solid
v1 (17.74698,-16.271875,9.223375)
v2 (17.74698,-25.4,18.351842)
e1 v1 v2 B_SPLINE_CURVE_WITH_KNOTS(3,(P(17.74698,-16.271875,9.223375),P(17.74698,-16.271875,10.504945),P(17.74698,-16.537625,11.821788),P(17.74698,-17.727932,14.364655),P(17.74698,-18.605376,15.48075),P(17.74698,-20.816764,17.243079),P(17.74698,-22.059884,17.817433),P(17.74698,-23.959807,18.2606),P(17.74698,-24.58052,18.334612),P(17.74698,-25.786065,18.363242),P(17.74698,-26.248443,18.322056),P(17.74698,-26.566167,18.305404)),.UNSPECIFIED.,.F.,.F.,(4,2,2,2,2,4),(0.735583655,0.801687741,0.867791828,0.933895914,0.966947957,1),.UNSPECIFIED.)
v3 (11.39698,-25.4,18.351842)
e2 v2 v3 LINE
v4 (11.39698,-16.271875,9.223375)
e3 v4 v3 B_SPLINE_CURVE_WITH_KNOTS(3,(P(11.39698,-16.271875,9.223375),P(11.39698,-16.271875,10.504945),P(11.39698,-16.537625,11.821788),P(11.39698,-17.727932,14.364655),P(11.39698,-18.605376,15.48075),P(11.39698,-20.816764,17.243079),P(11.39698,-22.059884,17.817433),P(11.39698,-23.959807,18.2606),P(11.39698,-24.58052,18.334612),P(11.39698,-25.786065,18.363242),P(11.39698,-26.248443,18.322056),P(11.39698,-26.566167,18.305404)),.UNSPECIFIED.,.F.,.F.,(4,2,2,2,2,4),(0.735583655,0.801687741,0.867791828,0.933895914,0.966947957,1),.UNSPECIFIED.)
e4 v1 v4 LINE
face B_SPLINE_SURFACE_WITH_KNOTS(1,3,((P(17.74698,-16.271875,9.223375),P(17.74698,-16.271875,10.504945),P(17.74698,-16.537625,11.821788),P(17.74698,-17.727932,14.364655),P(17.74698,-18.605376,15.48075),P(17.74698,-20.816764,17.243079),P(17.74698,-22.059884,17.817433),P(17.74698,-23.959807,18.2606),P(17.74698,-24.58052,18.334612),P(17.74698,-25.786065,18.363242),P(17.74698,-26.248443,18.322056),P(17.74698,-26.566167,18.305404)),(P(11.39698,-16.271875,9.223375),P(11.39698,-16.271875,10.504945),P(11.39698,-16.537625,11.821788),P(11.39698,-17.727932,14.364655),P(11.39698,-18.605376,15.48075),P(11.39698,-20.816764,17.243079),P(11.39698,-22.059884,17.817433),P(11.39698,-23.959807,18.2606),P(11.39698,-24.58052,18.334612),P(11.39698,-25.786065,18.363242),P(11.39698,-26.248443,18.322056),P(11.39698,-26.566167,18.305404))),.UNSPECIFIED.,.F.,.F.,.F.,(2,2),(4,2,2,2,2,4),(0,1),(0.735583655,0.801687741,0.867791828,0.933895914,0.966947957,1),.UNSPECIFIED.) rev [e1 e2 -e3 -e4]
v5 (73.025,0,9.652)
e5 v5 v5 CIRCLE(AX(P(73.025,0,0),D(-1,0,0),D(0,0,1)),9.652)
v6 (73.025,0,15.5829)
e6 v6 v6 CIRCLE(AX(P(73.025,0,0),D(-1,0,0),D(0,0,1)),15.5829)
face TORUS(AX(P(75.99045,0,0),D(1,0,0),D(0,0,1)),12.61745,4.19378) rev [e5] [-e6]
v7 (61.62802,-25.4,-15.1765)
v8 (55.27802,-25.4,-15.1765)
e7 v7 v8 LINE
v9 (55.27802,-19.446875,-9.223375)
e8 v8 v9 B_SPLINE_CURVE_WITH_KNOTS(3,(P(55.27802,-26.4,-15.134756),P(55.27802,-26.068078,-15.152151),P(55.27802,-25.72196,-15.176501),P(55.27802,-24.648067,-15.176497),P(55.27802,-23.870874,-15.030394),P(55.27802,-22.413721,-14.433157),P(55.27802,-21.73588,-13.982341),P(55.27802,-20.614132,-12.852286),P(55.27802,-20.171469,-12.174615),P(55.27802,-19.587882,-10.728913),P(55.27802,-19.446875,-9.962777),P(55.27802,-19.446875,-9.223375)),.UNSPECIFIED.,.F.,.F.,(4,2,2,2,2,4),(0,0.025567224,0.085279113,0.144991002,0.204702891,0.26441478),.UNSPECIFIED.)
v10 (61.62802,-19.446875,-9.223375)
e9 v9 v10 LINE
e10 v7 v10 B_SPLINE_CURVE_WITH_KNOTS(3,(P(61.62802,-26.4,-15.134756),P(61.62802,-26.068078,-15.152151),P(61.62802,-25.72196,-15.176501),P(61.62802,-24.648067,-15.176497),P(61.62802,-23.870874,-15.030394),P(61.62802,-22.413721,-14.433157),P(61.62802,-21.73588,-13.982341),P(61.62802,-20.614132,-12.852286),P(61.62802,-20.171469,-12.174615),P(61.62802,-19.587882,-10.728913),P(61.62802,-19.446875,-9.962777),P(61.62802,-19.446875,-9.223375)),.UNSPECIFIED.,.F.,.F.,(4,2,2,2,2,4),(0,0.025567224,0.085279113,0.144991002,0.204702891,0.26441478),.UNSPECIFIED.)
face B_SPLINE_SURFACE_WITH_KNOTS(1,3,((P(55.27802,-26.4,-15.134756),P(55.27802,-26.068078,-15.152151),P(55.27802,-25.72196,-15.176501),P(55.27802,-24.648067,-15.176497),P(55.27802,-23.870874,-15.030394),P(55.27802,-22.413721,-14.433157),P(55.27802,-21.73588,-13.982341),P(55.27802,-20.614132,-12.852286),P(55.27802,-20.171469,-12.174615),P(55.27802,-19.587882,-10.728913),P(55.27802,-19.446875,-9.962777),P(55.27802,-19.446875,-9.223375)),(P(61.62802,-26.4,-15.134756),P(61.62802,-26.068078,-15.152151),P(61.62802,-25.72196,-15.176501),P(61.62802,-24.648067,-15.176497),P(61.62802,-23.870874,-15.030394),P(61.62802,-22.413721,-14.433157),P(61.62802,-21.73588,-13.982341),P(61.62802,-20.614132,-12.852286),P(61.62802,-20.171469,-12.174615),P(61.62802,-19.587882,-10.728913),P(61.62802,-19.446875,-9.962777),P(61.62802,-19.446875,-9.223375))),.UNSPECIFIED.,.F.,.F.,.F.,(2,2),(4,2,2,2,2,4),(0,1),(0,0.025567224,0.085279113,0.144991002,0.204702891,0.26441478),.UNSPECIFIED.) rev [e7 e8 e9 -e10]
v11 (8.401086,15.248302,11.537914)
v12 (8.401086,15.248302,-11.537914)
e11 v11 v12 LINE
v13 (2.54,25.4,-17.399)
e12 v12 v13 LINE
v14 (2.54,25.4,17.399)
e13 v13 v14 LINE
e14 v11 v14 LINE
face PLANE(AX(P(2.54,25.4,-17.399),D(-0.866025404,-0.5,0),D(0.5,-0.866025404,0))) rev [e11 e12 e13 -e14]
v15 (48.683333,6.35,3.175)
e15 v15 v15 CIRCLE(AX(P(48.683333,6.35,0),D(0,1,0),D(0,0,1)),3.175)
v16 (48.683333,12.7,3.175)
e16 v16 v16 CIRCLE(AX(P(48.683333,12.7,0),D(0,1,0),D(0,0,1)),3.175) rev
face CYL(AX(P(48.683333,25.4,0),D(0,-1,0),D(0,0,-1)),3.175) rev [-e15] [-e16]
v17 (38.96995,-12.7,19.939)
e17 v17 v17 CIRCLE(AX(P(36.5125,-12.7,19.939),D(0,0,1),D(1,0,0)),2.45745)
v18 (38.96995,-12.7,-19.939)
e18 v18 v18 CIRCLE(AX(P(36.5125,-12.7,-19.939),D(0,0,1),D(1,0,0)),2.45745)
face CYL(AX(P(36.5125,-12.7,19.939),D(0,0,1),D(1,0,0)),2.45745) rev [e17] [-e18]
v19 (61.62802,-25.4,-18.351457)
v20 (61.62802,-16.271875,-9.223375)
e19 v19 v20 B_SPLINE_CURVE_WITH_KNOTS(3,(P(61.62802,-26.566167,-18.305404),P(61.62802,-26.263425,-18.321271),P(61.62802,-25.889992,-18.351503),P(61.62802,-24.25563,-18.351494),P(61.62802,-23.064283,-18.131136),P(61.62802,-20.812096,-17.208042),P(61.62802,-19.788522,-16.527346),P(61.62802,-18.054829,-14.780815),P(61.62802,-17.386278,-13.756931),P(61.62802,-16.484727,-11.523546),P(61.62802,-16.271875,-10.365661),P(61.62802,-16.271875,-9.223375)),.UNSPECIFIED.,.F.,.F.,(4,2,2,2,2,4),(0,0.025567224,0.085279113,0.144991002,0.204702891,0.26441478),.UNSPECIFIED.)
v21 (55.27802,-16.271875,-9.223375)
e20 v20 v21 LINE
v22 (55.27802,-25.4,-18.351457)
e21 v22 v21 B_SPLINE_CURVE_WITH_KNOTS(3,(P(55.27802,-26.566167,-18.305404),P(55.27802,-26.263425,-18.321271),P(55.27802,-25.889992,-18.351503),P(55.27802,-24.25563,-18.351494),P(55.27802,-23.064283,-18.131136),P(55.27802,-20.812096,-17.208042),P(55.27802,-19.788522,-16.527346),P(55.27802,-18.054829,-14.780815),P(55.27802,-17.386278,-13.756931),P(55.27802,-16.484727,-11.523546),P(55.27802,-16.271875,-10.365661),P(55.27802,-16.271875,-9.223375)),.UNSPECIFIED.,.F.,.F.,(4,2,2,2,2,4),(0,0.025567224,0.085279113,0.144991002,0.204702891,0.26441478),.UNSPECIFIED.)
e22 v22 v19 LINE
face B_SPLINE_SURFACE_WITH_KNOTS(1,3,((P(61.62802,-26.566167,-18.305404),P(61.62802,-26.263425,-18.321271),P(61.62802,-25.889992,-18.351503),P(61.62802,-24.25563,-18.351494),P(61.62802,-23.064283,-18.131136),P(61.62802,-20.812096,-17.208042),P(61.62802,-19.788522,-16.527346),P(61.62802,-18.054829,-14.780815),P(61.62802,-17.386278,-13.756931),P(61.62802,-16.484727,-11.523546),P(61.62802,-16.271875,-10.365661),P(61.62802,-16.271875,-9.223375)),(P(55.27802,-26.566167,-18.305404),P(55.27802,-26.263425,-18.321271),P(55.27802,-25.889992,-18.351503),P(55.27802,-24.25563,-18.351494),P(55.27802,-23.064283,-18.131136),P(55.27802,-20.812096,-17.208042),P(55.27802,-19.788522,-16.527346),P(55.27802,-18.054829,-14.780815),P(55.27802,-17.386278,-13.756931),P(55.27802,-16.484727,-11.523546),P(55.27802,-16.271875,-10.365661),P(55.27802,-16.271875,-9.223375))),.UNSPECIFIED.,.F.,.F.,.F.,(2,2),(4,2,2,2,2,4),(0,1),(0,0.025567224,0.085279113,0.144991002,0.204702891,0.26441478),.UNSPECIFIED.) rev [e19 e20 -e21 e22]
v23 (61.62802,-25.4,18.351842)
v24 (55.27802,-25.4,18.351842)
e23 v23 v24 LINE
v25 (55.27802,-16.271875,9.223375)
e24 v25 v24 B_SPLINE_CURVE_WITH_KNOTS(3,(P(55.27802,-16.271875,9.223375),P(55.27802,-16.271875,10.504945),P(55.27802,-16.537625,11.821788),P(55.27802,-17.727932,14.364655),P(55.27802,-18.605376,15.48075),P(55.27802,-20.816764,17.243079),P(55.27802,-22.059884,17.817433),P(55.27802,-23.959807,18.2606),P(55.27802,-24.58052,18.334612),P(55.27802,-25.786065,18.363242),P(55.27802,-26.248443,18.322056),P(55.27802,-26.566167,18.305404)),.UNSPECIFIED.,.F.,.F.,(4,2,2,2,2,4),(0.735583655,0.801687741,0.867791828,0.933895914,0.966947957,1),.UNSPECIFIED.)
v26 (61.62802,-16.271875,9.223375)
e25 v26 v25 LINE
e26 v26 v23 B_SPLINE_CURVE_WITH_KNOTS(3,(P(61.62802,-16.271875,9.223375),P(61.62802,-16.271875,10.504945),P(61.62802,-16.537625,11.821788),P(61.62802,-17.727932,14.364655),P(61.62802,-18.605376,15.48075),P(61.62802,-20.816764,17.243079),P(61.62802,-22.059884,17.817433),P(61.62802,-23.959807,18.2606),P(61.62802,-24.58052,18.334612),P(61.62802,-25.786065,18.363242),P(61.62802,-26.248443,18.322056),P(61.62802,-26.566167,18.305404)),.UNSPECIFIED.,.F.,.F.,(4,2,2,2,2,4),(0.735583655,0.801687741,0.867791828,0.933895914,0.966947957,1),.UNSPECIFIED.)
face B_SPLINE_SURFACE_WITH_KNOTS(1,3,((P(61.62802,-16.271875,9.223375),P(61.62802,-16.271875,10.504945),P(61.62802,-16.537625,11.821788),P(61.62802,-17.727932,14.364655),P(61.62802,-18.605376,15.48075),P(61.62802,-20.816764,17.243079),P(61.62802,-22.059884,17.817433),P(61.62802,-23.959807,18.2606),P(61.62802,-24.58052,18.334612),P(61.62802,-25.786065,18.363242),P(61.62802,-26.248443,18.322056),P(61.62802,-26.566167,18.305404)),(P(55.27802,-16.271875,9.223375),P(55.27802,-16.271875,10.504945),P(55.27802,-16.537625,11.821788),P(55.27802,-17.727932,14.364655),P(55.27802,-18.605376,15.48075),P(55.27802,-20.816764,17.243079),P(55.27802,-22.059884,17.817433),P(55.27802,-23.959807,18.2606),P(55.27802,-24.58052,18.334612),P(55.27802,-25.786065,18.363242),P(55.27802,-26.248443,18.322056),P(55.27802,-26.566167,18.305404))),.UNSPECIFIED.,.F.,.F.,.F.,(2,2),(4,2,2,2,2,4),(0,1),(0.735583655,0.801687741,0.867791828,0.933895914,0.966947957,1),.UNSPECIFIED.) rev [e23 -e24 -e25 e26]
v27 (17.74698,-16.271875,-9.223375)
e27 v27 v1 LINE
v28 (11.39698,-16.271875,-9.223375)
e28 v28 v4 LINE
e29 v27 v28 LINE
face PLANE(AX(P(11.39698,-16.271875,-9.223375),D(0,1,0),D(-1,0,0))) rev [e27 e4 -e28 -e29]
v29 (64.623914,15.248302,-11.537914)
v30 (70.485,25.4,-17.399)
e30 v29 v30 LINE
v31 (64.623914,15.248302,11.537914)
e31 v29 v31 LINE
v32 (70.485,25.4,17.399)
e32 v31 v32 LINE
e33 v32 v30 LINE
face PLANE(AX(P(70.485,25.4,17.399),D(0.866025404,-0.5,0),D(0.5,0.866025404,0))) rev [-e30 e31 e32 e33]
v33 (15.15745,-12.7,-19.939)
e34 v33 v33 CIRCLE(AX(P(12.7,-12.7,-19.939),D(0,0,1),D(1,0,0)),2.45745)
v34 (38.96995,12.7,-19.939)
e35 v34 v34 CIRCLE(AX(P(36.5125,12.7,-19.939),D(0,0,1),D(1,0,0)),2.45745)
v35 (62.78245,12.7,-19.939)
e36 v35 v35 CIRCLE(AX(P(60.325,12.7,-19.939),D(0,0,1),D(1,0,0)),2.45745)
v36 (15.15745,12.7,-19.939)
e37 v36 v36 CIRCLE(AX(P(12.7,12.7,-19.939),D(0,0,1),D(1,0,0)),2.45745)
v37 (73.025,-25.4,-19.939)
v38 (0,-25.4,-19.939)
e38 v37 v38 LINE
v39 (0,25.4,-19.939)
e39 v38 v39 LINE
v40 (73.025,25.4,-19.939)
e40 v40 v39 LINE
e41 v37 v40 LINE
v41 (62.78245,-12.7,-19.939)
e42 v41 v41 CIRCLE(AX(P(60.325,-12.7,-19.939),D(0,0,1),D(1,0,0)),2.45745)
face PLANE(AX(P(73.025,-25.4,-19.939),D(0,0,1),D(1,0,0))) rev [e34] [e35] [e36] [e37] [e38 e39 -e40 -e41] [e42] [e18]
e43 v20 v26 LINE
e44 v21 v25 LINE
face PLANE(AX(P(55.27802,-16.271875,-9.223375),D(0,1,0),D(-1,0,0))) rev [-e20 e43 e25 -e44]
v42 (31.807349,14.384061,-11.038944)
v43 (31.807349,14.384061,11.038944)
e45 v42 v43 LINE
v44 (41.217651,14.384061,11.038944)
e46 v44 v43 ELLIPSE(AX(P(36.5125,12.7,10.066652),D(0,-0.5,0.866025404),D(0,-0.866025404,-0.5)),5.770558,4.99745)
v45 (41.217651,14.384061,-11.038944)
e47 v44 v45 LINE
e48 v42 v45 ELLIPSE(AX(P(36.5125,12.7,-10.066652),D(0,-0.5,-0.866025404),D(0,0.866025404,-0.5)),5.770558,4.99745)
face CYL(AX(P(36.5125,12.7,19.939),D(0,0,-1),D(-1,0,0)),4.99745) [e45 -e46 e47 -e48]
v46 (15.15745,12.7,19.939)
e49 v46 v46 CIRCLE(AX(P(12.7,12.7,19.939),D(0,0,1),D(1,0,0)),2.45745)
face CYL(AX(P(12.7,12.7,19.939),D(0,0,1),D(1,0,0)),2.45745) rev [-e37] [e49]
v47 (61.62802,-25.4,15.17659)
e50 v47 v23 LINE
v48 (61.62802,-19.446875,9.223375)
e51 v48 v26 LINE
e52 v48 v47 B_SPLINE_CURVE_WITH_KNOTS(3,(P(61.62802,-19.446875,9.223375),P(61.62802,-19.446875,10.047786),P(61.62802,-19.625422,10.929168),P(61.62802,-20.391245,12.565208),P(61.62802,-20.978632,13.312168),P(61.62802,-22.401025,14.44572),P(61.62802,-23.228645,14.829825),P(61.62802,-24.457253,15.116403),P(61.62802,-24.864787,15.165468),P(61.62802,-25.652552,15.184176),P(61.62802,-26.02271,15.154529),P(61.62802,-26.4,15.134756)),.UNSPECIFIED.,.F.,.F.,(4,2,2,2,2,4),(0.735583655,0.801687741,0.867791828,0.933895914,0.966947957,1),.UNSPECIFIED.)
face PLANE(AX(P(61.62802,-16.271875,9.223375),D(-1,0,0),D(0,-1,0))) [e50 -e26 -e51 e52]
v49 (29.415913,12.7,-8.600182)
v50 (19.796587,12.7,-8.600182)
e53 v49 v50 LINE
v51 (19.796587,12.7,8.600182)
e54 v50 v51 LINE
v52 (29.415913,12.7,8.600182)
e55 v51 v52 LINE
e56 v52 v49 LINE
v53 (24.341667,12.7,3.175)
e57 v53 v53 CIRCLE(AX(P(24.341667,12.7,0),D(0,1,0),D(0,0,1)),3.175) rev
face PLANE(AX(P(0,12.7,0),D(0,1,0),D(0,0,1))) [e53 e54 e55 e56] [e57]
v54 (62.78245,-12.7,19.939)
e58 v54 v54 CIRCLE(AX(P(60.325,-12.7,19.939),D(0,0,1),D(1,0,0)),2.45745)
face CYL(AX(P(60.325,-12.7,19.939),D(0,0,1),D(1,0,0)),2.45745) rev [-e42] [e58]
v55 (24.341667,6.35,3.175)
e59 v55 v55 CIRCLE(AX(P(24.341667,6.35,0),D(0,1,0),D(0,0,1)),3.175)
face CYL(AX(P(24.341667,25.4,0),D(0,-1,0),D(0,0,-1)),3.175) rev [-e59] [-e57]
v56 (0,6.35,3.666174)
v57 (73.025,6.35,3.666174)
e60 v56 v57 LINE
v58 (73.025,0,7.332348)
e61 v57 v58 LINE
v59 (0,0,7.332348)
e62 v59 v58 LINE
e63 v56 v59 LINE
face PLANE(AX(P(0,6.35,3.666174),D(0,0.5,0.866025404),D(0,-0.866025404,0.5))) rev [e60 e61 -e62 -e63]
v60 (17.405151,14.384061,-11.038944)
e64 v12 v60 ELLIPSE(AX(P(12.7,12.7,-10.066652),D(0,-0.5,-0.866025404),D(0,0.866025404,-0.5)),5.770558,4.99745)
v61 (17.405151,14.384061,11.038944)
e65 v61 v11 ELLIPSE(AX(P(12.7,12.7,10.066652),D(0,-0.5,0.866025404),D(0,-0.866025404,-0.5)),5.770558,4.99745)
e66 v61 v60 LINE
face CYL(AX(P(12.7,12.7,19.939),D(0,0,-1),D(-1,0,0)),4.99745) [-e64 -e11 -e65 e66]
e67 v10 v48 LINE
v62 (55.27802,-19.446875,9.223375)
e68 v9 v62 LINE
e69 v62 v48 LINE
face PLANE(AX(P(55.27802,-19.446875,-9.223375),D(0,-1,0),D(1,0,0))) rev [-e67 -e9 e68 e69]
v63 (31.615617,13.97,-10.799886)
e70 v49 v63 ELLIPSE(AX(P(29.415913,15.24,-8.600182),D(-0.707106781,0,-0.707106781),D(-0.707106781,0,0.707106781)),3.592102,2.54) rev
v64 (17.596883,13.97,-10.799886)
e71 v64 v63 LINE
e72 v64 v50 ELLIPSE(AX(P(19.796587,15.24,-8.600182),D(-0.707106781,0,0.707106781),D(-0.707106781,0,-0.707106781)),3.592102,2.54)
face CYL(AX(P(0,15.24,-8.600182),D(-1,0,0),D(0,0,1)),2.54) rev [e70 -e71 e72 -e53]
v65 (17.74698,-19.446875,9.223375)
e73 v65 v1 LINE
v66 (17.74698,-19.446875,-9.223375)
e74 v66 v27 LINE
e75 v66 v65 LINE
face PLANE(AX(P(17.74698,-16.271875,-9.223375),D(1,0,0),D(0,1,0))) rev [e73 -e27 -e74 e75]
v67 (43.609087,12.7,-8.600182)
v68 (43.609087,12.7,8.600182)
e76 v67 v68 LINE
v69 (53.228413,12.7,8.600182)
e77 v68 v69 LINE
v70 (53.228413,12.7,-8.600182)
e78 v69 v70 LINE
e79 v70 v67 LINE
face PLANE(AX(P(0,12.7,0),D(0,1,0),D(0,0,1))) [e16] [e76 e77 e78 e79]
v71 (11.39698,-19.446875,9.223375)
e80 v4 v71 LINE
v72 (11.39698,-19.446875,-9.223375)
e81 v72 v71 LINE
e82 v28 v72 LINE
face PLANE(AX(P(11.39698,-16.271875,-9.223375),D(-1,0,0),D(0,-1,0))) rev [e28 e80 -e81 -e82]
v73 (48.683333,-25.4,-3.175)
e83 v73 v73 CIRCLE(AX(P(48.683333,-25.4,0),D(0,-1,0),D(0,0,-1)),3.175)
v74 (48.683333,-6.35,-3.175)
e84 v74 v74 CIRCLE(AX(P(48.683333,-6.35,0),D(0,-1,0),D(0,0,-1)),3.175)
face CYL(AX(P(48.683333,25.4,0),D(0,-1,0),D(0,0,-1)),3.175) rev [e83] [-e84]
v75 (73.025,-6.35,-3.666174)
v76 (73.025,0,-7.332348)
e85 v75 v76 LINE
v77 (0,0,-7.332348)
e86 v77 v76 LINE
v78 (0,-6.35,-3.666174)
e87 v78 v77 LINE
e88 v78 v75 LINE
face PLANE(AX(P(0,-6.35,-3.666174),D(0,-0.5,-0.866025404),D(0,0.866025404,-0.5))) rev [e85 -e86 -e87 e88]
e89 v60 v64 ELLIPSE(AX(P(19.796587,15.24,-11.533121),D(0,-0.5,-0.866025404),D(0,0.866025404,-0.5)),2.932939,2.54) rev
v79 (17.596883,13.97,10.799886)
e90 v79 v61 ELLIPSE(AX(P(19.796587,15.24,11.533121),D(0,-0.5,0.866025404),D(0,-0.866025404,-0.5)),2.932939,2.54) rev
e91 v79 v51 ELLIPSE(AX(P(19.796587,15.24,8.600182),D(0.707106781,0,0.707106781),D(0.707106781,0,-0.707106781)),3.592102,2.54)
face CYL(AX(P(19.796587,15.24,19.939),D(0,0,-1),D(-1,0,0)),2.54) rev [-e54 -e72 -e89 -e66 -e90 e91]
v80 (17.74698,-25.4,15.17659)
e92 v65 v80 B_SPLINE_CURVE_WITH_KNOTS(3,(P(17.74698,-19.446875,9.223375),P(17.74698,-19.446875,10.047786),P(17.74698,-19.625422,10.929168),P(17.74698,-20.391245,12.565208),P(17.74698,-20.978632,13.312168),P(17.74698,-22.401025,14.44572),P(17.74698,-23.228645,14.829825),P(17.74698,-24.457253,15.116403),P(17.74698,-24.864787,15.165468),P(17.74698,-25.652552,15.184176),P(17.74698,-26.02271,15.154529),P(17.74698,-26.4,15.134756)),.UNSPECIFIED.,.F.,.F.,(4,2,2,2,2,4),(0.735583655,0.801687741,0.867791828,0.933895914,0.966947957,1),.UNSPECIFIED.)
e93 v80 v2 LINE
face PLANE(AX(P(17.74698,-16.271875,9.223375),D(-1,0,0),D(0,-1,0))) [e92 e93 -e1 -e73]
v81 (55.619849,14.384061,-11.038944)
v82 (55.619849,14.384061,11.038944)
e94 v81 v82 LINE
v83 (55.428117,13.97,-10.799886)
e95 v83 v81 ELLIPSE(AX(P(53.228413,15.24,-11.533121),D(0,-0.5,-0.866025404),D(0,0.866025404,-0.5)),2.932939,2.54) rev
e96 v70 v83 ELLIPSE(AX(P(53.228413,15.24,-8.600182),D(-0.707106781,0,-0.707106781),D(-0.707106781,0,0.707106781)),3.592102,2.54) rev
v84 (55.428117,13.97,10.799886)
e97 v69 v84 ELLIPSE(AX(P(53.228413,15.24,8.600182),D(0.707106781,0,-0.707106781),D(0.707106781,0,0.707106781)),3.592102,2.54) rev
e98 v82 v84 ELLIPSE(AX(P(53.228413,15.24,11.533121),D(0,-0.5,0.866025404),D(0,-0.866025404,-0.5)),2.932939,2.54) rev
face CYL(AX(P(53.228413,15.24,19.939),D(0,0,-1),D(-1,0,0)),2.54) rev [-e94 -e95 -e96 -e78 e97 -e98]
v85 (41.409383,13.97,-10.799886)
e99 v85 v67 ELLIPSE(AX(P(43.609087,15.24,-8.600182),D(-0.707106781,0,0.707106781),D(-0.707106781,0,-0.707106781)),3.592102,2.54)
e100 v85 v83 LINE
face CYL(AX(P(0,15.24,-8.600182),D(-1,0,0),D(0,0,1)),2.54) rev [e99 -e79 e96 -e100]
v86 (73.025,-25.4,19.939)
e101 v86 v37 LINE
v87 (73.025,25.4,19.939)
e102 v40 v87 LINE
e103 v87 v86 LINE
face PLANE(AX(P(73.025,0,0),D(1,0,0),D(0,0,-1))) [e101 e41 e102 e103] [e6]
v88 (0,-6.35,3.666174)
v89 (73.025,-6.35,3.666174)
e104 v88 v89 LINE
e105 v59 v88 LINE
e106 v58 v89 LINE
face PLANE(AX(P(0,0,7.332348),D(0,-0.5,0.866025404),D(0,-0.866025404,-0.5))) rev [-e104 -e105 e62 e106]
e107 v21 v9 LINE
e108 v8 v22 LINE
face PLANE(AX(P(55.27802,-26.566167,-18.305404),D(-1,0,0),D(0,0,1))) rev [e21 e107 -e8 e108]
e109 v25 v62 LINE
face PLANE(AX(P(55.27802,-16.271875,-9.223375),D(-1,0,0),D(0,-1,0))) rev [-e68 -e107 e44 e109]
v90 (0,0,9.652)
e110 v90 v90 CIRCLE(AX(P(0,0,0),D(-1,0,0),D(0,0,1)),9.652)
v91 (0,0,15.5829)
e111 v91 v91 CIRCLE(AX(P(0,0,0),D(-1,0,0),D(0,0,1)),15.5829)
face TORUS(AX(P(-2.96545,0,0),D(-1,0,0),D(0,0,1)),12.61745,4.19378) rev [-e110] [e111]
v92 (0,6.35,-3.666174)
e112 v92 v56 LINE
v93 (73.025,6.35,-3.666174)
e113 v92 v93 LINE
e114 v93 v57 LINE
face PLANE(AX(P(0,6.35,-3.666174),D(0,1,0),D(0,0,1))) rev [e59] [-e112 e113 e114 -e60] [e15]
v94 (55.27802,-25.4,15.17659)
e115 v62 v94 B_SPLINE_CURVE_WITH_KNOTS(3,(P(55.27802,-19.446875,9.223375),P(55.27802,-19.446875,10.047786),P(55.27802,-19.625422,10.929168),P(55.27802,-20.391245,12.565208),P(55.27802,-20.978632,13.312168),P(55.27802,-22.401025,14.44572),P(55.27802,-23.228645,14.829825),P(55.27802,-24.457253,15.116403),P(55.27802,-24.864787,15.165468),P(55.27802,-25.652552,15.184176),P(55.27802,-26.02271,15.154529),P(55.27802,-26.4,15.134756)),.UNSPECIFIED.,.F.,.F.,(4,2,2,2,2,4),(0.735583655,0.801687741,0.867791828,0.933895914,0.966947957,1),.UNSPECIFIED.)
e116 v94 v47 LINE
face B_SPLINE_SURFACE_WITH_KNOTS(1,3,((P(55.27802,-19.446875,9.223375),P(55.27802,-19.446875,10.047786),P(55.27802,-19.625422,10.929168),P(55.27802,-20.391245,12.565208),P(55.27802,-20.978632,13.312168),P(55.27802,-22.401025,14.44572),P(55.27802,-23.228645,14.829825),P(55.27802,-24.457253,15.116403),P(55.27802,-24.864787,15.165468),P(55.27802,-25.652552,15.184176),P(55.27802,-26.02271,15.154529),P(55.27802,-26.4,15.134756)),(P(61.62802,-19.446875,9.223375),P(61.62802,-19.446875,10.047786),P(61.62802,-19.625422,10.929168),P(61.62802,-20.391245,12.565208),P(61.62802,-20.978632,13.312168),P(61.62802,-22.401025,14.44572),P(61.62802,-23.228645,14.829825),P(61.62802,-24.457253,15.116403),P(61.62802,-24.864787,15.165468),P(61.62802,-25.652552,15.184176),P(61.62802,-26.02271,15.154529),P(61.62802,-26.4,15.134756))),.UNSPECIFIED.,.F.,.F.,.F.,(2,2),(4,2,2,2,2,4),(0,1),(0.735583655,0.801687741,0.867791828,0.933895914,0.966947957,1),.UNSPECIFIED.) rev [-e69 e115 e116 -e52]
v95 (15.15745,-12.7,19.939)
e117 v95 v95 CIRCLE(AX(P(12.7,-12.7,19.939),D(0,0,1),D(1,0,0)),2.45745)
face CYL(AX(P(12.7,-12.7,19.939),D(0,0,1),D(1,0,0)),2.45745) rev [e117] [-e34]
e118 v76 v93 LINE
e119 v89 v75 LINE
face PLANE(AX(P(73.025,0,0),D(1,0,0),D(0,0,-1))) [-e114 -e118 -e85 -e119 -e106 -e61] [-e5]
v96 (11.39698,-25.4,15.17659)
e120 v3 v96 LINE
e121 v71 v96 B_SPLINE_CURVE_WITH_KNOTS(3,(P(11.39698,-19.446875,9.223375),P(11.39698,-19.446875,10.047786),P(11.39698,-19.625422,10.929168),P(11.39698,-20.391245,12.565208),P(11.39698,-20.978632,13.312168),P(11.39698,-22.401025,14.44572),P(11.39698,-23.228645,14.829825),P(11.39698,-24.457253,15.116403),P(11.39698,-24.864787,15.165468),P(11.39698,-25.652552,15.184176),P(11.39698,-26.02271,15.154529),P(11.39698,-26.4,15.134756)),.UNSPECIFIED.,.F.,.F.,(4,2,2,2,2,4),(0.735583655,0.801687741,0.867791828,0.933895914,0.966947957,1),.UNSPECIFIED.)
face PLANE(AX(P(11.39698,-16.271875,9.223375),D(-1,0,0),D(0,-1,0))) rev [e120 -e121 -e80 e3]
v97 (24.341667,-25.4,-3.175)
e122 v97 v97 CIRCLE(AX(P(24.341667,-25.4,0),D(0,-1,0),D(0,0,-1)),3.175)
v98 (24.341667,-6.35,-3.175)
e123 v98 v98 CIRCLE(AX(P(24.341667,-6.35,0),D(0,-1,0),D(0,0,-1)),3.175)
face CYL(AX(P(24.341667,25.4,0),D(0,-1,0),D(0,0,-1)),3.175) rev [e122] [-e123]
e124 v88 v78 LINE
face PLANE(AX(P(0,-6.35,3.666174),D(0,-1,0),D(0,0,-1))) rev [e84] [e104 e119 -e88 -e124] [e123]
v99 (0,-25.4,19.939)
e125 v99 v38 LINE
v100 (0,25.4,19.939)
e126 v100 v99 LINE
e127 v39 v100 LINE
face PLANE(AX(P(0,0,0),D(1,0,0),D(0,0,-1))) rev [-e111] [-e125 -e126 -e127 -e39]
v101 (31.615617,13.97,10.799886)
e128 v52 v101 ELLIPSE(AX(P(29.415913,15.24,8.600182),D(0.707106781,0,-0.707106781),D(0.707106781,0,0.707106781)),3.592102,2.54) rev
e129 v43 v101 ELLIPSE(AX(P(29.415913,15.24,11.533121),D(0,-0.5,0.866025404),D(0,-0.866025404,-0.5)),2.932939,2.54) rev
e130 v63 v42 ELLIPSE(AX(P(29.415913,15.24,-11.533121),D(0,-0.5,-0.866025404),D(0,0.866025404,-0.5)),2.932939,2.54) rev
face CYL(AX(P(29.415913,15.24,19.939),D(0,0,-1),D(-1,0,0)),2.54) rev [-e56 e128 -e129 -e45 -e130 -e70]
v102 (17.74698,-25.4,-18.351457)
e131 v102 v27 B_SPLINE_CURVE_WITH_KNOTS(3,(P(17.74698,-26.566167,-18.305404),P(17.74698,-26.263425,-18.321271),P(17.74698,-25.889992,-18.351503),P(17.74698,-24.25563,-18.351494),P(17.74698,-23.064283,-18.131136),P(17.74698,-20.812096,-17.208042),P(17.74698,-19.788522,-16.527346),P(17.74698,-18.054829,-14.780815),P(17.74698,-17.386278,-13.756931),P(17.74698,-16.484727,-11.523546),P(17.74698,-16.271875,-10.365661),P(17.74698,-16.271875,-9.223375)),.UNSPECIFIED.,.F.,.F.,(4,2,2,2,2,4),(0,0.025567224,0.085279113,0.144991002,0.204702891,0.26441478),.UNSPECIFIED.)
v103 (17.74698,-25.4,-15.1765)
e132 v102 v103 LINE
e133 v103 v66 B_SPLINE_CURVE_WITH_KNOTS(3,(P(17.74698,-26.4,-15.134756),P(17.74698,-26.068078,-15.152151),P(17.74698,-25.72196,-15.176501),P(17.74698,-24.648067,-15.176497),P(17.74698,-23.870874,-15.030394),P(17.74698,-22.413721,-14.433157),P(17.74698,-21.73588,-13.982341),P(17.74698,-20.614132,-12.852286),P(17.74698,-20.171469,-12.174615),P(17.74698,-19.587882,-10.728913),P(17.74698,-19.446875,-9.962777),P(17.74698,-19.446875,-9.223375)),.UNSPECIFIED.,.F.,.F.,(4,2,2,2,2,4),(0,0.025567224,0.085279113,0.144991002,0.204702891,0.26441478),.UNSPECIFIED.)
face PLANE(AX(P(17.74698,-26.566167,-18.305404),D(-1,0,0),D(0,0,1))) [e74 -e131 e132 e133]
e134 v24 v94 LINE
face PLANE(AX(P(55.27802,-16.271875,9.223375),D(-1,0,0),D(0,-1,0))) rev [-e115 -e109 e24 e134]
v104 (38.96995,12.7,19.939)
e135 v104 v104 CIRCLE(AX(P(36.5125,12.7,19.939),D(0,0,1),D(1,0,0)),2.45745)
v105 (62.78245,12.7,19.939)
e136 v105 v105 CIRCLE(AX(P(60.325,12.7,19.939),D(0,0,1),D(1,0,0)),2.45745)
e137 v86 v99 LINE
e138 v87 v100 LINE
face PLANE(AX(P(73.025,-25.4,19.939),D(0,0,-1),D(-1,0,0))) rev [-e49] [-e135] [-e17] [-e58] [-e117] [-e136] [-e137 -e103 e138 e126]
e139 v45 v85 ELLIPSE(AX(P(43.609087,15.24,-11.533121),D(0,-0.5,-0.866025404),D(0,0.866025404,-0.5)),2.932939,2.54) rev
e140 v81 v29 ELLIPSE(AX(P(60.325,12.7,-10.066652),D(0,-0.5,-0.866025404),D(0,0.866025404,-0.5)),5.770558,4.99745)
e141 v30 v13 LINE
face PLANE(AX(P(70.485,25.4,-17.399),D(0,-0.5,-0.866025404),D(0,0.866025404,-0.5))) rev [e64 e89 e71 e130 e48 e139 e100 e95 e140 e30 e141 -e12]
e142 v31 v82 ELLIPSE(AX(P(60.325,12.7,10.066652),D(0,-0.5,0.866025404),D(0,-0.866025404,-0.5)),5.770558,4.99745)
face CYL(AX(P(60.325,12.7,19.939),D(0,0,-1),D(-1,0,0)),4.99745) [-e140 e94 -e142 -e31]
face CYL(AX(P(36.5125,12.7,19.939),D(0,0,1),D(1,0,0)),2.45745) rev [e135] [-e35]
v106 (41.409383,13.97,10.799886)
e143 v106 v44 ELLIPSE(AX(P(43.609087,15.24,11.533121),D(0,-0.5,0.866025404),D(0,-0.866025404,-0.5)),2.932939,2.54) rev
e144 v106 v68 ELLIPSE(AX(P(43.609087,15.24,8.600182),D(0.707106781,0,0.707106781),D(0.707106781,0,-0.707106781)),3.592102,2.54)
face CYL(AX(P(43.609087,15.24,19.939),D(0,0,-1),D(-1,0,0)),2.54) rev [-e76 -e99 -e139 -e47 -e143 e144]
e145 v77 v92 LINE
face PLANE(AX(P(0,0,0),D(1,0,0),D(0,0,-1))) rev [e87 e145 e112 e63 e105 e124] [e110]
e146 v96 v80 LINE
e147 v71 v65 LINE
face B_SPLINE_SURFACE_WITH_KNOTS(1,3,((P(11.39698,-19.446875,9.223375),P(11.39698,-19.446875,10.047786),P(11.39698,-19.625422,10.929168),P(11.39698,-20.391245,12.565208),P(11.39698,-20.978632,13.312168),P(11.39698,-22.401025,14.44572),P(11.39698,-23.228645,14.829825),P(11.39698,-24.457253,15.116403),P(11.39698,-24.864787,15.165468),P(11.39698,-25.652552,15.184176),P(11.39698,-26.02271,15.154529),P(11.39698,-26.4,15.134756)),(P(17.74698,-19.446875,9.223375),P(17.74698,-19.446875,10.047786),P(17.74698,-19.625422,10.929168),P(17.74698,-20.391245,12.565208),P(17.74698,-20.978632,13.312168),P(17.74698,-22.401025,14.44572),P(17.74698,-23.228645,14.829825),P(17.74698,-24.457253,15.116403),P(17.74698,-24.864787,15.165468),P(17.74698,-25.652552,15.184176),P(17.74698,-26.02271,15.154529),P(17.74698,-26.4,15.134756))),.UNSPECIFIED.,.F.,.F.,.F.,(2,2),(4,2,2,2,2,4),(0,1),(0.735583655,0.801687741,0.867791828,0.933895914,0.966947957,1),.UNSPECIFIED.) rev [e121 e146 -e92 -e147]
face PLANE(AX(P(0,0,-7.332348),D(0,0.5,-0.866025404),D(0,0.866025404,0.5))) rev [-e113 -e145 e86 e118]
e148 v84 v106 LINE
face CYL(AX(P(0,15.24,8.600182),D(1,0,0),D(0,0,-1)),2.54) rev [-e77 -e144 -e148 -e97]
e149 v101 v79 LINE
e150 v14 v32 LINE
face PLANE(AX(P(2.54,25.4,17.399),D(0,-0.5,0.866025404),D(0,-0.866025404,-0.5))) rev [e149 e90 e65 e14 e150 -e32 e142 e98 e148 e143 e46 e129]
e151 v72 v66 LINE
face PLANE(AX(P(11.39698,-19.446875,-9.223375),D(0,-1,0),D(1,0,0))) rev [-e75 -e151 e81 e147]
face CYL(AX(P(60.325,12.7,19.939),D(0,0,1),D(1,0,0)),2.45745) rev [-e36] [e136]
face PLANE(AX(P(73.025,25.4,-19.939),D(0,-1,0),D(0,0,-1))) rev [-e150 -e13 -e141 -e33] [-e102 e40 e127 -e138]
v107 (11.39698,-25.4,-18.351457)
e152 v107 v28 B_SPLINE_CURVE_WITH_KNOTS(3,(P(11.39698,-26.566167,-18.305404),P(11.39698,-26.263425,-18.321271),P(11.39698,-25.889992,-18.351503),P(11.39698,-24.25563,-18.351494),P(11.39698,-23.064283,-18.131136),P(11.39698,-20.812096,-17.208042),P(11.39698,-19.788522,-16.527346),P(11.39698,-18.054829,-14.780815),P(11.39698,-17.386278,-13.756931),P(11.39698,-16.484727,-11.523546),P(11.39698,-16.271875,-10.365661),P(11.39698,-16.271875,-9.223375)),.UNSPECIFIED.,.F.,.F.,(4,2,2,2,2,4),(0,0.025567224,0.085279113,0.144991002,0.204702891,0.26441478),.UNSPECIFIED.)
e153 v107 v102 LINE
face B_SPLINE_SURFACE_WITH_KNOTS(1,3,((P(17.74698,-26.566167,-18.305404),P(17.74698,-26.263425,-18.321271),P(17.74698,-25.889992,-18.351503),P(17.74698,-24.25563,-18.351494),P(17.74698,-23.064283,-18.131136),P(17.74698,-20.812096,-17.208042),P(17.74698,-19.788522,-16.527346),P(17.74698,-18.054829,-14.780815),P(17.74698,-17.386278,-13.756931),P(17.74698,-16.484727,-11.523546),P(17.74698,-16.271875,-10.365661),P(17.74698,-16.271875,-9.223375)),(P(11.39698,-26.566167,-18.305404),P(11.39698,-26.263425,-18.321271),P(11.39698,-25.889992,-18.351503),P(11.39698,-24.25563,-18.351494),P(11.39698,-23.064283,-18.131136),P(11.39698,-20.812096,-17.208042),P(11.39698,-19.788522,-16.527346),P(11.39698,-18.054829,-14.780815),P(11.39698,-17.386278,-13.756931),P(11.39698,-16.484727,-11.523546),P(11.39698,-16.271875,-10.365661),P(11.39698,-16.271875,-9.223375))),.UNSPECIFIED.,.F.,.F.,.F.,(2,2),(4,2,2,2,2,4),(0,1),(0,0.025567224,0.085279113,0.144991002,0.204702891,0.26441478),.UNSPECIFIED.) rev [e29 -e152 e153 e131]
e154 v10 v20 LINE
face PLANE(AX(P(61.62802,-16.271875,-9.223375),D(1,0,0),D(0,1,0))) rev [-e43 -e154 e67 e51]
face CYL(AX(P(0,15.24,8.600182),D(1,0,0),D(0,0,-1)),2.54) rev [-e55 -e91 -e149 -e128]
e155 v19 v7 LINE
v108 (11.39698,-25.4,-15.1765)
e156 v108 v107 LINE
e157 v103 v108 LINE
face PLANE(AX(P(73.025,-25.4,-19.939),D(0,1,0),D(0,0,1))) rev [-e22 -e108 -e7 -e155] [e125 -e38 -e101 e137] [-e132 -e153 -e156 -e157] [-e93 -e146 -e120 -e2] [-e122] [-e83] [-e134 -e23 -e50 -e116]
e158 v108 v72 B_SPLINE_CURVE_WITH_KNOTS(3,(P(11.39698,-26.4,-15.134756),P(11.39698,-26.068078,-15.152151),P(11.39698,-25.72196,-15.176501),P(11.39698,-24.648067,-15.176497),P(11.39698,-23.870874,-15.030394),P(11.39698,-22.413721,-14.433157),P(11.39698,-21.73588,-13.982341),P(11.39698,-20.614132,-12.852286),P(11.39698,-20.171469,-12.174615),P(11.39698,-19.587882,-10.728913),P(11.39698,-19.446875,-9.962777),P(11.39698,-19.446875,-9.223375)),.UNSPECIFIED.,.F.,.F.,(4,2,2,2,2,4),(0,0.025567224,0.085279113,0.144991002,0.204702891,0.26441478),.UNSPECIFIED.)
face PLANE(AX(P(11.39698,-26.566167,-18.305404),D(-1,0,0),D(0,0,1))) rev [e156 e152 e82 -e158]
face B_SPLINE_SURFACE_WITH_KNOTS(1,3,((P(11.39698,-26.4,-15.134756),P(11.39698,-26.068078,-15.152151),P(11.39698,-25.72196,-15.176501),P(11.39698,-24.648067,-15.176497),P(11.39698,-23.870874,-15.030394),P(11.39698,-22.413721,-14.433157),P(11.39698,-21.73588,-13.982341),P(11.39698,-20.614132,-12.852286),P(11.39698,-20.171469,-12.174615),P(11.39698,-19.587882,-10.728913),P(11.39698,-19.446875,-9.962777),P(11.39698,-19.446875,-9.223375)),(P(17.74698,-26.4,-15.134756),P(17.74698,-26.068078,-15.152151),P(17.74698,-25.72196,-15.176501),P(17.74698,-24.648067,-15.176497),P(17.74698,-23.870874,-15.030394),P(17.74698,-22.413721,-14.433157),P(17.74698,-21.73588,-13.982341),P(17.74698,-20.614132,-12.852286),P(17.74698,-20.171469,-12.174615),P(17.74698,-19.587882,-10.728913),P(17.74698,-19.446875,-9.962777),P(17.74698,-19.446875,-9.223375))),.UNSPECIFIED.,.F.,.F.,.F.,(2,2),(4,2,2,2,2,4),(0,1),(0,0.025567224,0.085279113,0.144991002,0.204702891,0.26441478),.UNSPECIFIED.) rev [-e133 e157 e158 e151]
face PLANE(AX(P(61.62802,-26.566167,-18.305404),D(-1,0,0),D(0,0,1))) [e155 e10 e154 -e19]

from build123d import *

# Parameters (mm, degrees)
SKETCH1_W                    = 39.878
SKETCH1_H                    = 50.8
BOSS_EXTRUDE1_DEPTH          = 73.025
CUT_EXTRUDE2_DEPTH           = 80.845941325
SKETCH9_R                    = 3.175
CUT_EXTRUDE4_DEPTH           = 93.511894506
F_10_0_1935_DIAMETER_HOLE1_D = 4.9149
SKETCH11_W                   = 67.945
SKETCH11_H                   = 34.798
CUT_EXTRUDE5_DEPTH           = 12.7
CUT_EXTRUDE5_DRAFT           = -30
EXTRUDE_THIN1_REACH          = 88.995
SKETCH12_R                   = 4.99745
SKETCH12_R_2                 = 2.45745
FILLET1_R                    = 2.54


with BuildPart() as part:
    # Sketch1 → Boss-Extrude1 (new body)
    with BuildSketch(Plane(origin=(0, 0, 0), x_dir=(0, 0, -1), z_dir=(1, 0, 0))):
        Rectangle(SKETCH1_W, SKETCH1_H)
    extrude(amount=BOSS_EXTRUDE1_DEPTH)

    # Sketch3 → Cut-Extrude2 (cut, through all)
    with BuildSketch(Plane(origin=(73.025, 0, 0), x_dir=(0, 0, -1), z_dir=(1, 0, 0))):
        Polygon((3.666174209, 6.35), (-3.666174209, 6.35), (-7.332348419, 0), (-3.666174209, -6.35), (3.666174209, -6.35), (7.332348419, 0), align=None)
    extrude(amount=-CUT_EXTRUDE2_DEPTH, mode=Mode.SUBTRACT)

    # Sketch9 → Cut-Extrude4 (cut, through all)
    with BuildSketch(Plane(origin=(0, -25.4, -5.461), x_dir=(1, 0, 0), z_dir=(0, -1, 0))):
        with Locations(Location((24.341666667, 5.461, 0), (0, 0, 270))):
            Circle(SKETCH9_R)
        with Locations(Location((48.683333333, 5.461, 0), (0, 0, 270))):
            Circle(SKETCH9_R)
    extrude(amount=-CUT_EXTRUDE4_DEPTH, mode=Mode.SUBTRACT)

    # Cut-Sweep1: read off the stored shape, not the designer's step
    # Cut-Sweep1: loft between two sections, ruled curve by curve
    cut_sweep1_from = [
        Edge.make_bspline([(55.27802, -26.400000018, -15.134755726), (55.27802, -26.068077614, -15.152151062), (55.27802, -25.721960027, -15.176501267), (55.27802, -24.64806692, -15.17649704), (55.27802, -23.870873724, -15.030393808), (55.27802, -22.4137214, -14.433157355), (55.27802, -21.735879568, -13.982340569), (55.27802, -20.614131775, -12.852286443), (55.27802, -20.171469343, -12.174615377), (55.27802, -19.587882304, -10.728912945), (55.27802, -19.446875, -9.962776979), (55.27802, -19.446875, -9.223375)], [0, 0, 0, 0, 0.025567224, 0.025567224, 0.085279113, 0.085279113, 0.144991002, 0.144991002, 0.204702891, 0.204702891, 0.26441478, 0.26441478, 0.26441478, 0.26441478], 3),
        Edge.make_bspline([(55.27802, -26.566166679, -18.305404499), (55.27802, -26.263424965, -18.321270533), (55.27802, -25.889992145, -18.351502595), (55.27802, -24.25563029, -18.35149394), (55.27802, -23.064282925, -18.131136083), (55.27802, -20.812096264, -17.208042367), (55.27802, -19.788522216, -16.527346364), (55.27802, -18.054828511, -14.780815054), (55.27802, -17.386278491, -13.756930731), (55.27802, -16.484727368, -11.523546029), (55.27802, -16.271875, -10.365661382), (55.27802, -16.271875, -9.223375)], [0, 0, 0, 0, 0.025567224, 0.025567224, 0.085279113, 0.085279113, 0.144991002, 0.144991002, 0.204702891, 0.204702891, 0.26441478, 0.26441478, 0.26441478, 0.26441478], 3),
        Edge.make_bspline([(55.27802, -19.446875, 9.223375), (55.27802, -19.446875, 10.047786232), (55.27802, -19.625421872, 10.929168038), (55.27802, -20.391245406, 12.56520759), (55.27802, -20.978631569, 13.312168073), (55.27802, -22.401025327, 14.445720272), (55.27802, -23.228644676, 14.829824625), (55.27802, -24.457253142, 15.116402991), (55.27802, -24.864786623, 15.165468066), (55.27802, -25.652551734, 15.184176181), (55.27802, -26.022709672, 15.154528702), (55.27802, -26.400000018, 15.134755726)], [0.735583655, 0.735583655, 0.735583655, 0.735583655, 0.801687741, 0.801687741, 0.867791828, 0.867791828, 0.933895914, 0.933895914, 0.966947957, 0.966947957, 1, 1, 1, 1], 3),
        Edge.make_bspline([(55.27802, -16.271875, 9.223375), (55.27802, -16.271875, 10.504944594), (55.27802, -16.537624991, 11.821787882), (55.27802, -17.727931502, 14.364654747), (55.27802, -18.605376264, 15.480750251), (55.27802, -20.816764309, 17.243078545), (55.27802, -22.059883722, 17.817433387), (55.27802, -23.959807208, 18.260600105), (55.27802, -24.580520299, 18.334612193), (55.27802, -25.786065181, 18.36324232), (55.27802, -26.248443063, 18.322055703), (55.27802, -26.566166679, 18.305404499)], [0.735583655, 0.735583655, 0.735583655, 0.735583655, 0.801687741, 0.801687741, 0.867791828, 0.867791828, 0.933895914, 0.933895914, 0.966947957, 0.966947957, 1, 1, 1, 1], 3),
        Edge.make_line((55.27802, -19.446875, -9.223375), (55.27802, -19.446875, 9.223375)),
        Edge.make_line((55.27802, -16.271875, 9.223375), (55.27802, -16.271875, -9.223375)),
        Edge.make_line((55.27802, -26.566166679, -18.305404499), (55.27802, -26.400000018, -15.134755726)),
        Edge.make_line((55.27802, -26.566166679, 18.305404499), (55.27802, -26.400000018, 15.134755726)),
    ]
    cut_sweep1_to = [
        Edge.make_bspline([(61.62802, -26.400000018, -15.134755726), (61.62802, -26.068077614, -15.152151062), (61.62802, -25.721960027, -15.176501267), (61.62802, -24.64806692, -15.17649704), (61.62802, -23.870873724, -15.030393808), (61.62802, -22.4137214, -14.433157355), (61.62802, -21.735879568, -13.982340569), (61.62802, -20.614131775, -12.852286443), (61.62802, -20.171469343, -12.174615377), (61.62802, -19.587882304, -10.728912945), (61.62802, -19.446875, -9.962776979), (61.62802, -19.446875, -9.223375)], [0, 0, 0, 0, 0.025567224, 0.025567224, 0.085279113, 0.085279113, 0.144991002, 0.144991002, 0.204702891, 0.204702891, 0.26441478, 0.26441478, 0.26441478, 0.26441478], 3),
        Edge.make_bspline([(61.62802, -26.566166679, -18.305404499), (61.62802, -26.263424965, -18.321270533), (61.62802, -25.889992145, -18.351502595), (61.62802, -24.25563029, -18.35149394), (61.62802, -23.064282925, -18.131136083), (61.62802, -20.812096264, -17.208042367), (61.62802, -19.788522216, -16.527346364), (61.62802, -18.054828511, -14.780815054), (61.62802, -17.386278491, -13.756930731), (61.62802, -16.484727368, -11.523546029), (61.62802, -16.271875, -10.365661382), (61.62802, -16.271875, -9.223375)], [0, 0, 0, 0, 0.025567224, 0.025567224, 0.085279113, 0.085279113, 0.144991002, 0.144991002, 0.204702891, 0.204702891, 0.26441478, 0.26441478, 0.26441478, 0.26441478], 3),
        Edge.make_bspline([(61.62802, -19.446875, 9.223375), (61.62802, -19.446875, 10.047786232), (61.62802, -19.625421872, 10.929168038), (61.62802, -20.391245406, 12.56520759), (61.62802, -20.978631569, 13.312168073), (61.62802, -22.401025327, 14.445720272), (61.62802, -23.228644676, 14.829824625), (61.62802, -24.457253142, 15.116402991), (61.62802, -24.864786623, 15.165468066), (61.62802, -25.652551734, 15.184176181), (61.62802, -26.022709672, 15.154528702), (61.62802, -26.400000018, 15.134755726)], [0.735583655, 0.735583655, 0.735583655, 0.735583655, 0.801687741, 0.801687741, 0.867791828, 0.867791828, 0.933895914, 0.933895914, 0.966947957, 0.966947957, 1, 1, 1, 1], 3),
        Edge.make_bspline([(61.62802, -16.271875, 9.223375), (61.62802, -16.271875, 10.504944594), (61.62802, -16.537624991, 11.821787882), (61.62802, -17.727931502, 14.364654747), (61.62802, -18.605376264, 15.480750251), (61.62802, -20.816764309, 17.243078545), (61.62802, -22.059883722, 17.817433387), (61.62802, -23.959807208, 18.260600105), (61.62802, -24.580520299, 18.334612193), (61.62802, -25.786065181, 18.36324232), (61.62802, -26.248443063, 18.322055703), (61.62802, -26.566166679, 18.305404499)], [0.735583655, 0.735583655, 0.735583655, 0.735583655, 0.801687741, 0.801687741, 0.867791828, 0.867791828, 0.933895914, 0.933895914, 0.966947957, 0.966947957, 1, 1, 1, 1], 3),
        Edge.make_line((61.62802, -19.446875, -9.223375), (61.62802, -19.446875, 9.223375)),
        Edge.make_line((61.62802, -16.271875, 9.223375), (61.62802, -16.271875, -9.223375)),
        Edge.make_line((61.62802, -26.566166679, -18.305404499), (61.62802, -26.400000018, -15.134755726)),
        Edge.make_line((61.62802, -26.566166679, 18.305404499), (61.62802, -26.400000018, 15.134755726)),
    ]
    cut_sweep1 = Solid(Shell([*[Face.make_surface_from_curves(cut_sweep1_from[k], cut_sweep1_to[k]) for k in range(8)], Face(Wire(cut_sweep1_from)), Face(Wire(cut_sweep1_to))]))
    add(cut_sweep1, mode=Mode.SUBTRACT)

    # Cut-Sweep1 2: loft between two sections, ruled curve by curve
    cut_sweep1_2_from = [
        Edge.make_bspline([(11.39698, -26.400000017, -15.134755726), (11.39698, -26.068077614, -15.152151062), (11.39698, -25.721960027, -15.176501267), (11.39698, -24.64806692, -15.17649704), (11.39698, -23.870873724, -15.030393808), (11.39698, -22.4137214, -14.433157355), (11.39698, -21.735879568, -13.982340569), (11.39698, -20.614131775, -12.852286443), (11.39698, -20.171469343, -12.174615377), (11.39698, -19.587882304, -10.728912945), (11.39698, -19.446875, -9.962776978), (11.39698, -19.446875, -9.223375)], [0, 0, 0, 0, 0.025567224, 0.025567224, 0.085279113, 0.085279113, 0.144991002, 0.144991002, 0.204702891, 0.204702891, 0.26441478, 0.26441478, 0.26441478, 0.26441478], 3),
        Edge.make_bspline([(11.39698, -26.566166679, -18.305404499), (11.39698, -26.263424965, -18.321270533), (11.39698, -25.889992145, -18.351502595), (11.39698, -24.25563029, -18.35149394), (11.39698, -23.064282925, -18.131136083), (11.39698, -20.812096264, -17.208042367), (11.39698, -19.788522216, -16.527346364), (11.39698, -18.054828511, -14.780815053), (11.39698, -17.386278491, -13.756930731), (11.39698, -16.484727368, -11.523546028), (11.39698, -16.271875, -10.365661382), (11.39698, -16.271875, -9.223375)], [0, 0, 0, 0, 0.025567224, 0.025567224, 0.085279113, 0.085279113, 0.144991002, 0.144991002, 0.204702891, 0.204702891, 0.26441478, 0.26441478, 0.26441478, 0.26441478], 3),
        Edge.make_bspline([(11.39698, -19.446875, 9.223375), (11.39698, -19.446875, 10.047786232), (11.39698, -19.625421872, 10.929168038), (11.39698, -20.391245407, 12.565207589), (11.39698, -20.97863157, 13.312168073), (11.39698, -22.401025327, 14.445720271), (11.39698, -23.228644676, 14.829824624), (11.39698, -24.457253143, 15.11640299), (11.39698, -24.864786623, 15.165468065), (11.39698, -25.652551734, 15.18417618), (11.39698, -26.022709672, 15.154528701), (11.39698, -26.400000017, 15.134755725)], [0.735583655, 0.735583655, 0.735583655, 0.735583655, 0.801687741, 0.801687741, 0.867791828, 0.867791828, 0.933895914, 0.933895914, 0.966947957, 0.966947957, 1, 1, 1, 1], 3),
        Edge.make_bspline([(11.39698, -16.271875, 9.223375), (11.39698, -16.271875, 10.504944594), (11.39698, -16.537624992, 11.821787882), (11.39698, -17.727931503, 14.364654747), (11.39698, -18.605376265, 15.480750251), (11.39698, -20.81676431, 17.243078544), (11.39698, -22.059883722, 17.817433386), (11.39698, -23.959807209, 18.260600104), (11.39698, -24.5805203, 18.334612192), (11.39698, -25.786065181, 18.363242319), (11.39698, -26.248443063, 18.322055702), (11.39698, -26.566166679, 18.305404498)], [0.735583655, 0.735583655, 0.735583655, 0.735583655, 0.801687741, 0.801687741, 0.867791828, 0.867791828, 0.933895914, 0.933895914, 0.966947957, 0.966947957, 1, 1, 1, 1], 3),
        Edge.make_line((11.39698, -19.446875, -9.223375), (11.39698, -19.446875, 9.223375)),
        Edge.make_line((11.39698, -16.271875, 9.223375), (11.39698, -16.271875, -9.223375)),
        Edge.make_line((11.39698, -26.566166679, -18.305404499), (11.39698, -26.400000017, -15.134755726)),
        Edge.make_line((11.39698, -26.566166679, 18.305404498), (11.39698, -26.400000017, 15.134755725)),
    ]
    cut_sweep1_2_to = [
        Edge.make_bspline([(17.74698, -26.400000017, -15.134755726), (17.74698, -26.068077614, -15.152151062), (17.74698, -25.721960027, -15.176501267), (17.74698, -24.64806692, -15.17649704), (17.74698, -23.870873724, -15.030393808), (17.74698, -22.4137214, -14.433157355), (17.74698, -21.735879568, -13.982340569), (17.74698, -20.614131775, -12.852286443), (17.74698, -20.171469343, -12.174615377), (17.74698, -19.587882304, -10.728912945), (17.74698, -19.446875, -9.962776978), (17.74698, -19.446875, -9.223375)], [0, 0, 0, 0, 0.025567224, 0.025567224, 0.085279113, 0.085279113, 0.144991002, 0.144991002, 0.204702891, 0.204702891, 0.26441478, 0.26441478, 0.26441478, 0.26441478], 3),
        Edge.make_bspline([(17.74698, -26.566166679, -18.305404499), (17.74698, -26.263424965, -18.321270533), (17.74698, -25.889992145, -18.351502595), (17.74698, -24.25563029, -18.35149394), (17.74698, -23.064282925, -18.131136083), (17.74698, -20.812096264, -17.208042367), (17.74698, -19.788522216, -16.527346364), (17.74698, -18.054828511, -14.780815053), (17.74698, -17.386278491, -13.756930731), (17.74698, -16.484727368, -11.523546028), (17.74698, -16.271875, -10.365661382), (17.74698, -16.271875, -9.223375)], [0, 0, 0, 0, 0.025567224, 0.025567224, 0.085279113, 0.085279113, 0.144991002, 0.144991002, 0.204702891, 0.204702891, 0.26441478, 0.26441478, 0.26441478, 0.26441478], 3),
        Edge.make_bspline([(17.74698, -19.446875, 9.223375), (17.74698, -19.446875, 10.047786232), (17.74698, -19.625421872, 10.929168038), (17.74698, -20.391245407, 12.565207589), (17.74698, -20.97863157, 13.312168073), (17.74698, -22.401025327, 14.445720271), (17.74698, -23.228644676, 14.829824624), (17.74698, -24.457253142, 15.11640299), (17.74698, -24.864786623, 15.165468065), (17.74698, -25.652551734, 15.18417618), (17.74698, -26.022709672, 15.154528701), (17.74698, -26.400000018, 15.134755725)], [0.735583655, 0.735583655, 0.735583655, 0.735583655, 0.801687741, 0.801687741, 0.867791828, 0.867791828, 0.933895914, 0.933895914, 0.966947957, 0.966947957, 1, 1, 1, 1], 3),
        Edge.make_bspline([(17.74698, -16.271875, 9.223375), (17.74698, -16.271875, 10.504944594), (17.74698, -16.537624992, 11.821787882), (17.74698, -17.727931503, 14.364654747), (17.74698, -18.605376265, 15.480750251), (17.74698, -20.81676431, 17.243078544), (17.74698, -22.059883722, 17.817433386), (17.74698, -23.959807209, 18.260600104), (17.74698, -24.5805203, 18.334612192), (17.74698, -25.786065181, 18.363242319), (17.74698, -26.248443063, 18.322055702), (17.74698, -26.566166679, 18.305404498)], [0.735583655, 0.735583655, 0.735583655, 0.735583655, 0.801687741, 0.801687741, 0.867791828, 0.867791828, 0.933895914, 0.933895914, 0.966947957, 0.966947957, 1, 1, 1, 1], 3),
        Edge.make_line((17.74698, -19.446875, -9.223375), (17.74698, -19.446875, 9.223375)),
        Edge.make_line((17.74698, -16.271875, 9.223375), (17.74698, -16.271875, -9.223375)),
        Edge.make_line((17.74698, -26.566166679, -18.305404499), (17.74698, -26.400000017, -15.134755726)),
        Edge.make_line((17.74698, -26.566166679, 18.305404498), (17.74698, -26.400000018, 15.134755725)),
    ]
    cut_sweep1_2 = Solid(Shell([*[Face.make_surface_from_curves(cut_sweep1_2_from[k], cut_sweep1_2_to[k]) for k in range(8)], Face(Wire(cut_sweep1_2_from)), Face(Wire(cut_sweep1_2_to))]))
    add(cut_sweep1_2, mode=Mode.SUBTRACT)

    # #10 (0.1935) Diameter Hole1 (through all)
    with Locations(Plane.XY.offset(19.939)):
        with Locations((12.7, 12.7), (36.5125, 12.7), (60.325, 12.7), (60.325, -12.7), (36.5125, -12.7), (12.7, -12.7)):
            Hole(F_10_0_1935_DIAMETER_HOLE1_D / 2)


with BuildPart() as cut_extrude5_tool:
    # Sketch11 → Cut-Extrude5 (with draft: the straight prism first)
    with BuildSketch(Plane(origin=(0, 25.4, 0), x_dir=(1, 0, 0), z_dir=(0, 1, 0))):
        with Locations((36.5125, 0)):
            Rectangle(SKETCH11_W, SKETCH11_H)
    extrude(amount=-CUT_EXTRUDE5_DEPTH)
    # Cut-Extrude5: the draft: its side faces are tilted about the plane it starts from
    cut_extrude5_sides = [cut_extrude5_tool.faces().sort_by_distance(p)[0] for p in [
        (70.485, 19.05, 0),
        (36.5125, 19.05, -17.399),
        (2.54, 19.05, 0),
        (36.5125, 19.05, 17.399),
    ]]
    draft(cut_extrude5_sides, Plane(origin=(0, 25.4, 0), x_dir=(1, 0, 0), z_dir=(0, 1, 0)), CUT_EXTRUDE5_DRAFT)


with BuildPart() as part_1:
    add(part.part)

    # Cut-Extrude5: cut by cut_extrude5_tool
    add(cut_extrude5_tool.part, mode=Mode.SUBTRACT)

    # Sketch12 → Extrude-Thin1 (add, up to next)
    with BuildSketch(Plane(origin=(0, 0, -19.939), x_dir=(-1, 0, 0), z_dir=(0, 0, -1)), mode=Mode.PRIVATE) as extrude_thin1_sk1:
        with Locations((-12.7, 12.7)):
            Circle(SKETCH12_R)
        with Locations((-12.7, 12.7)):
            Circle(SKETCH12_R_2, mode=Mode.SUBTRACT)
    extrude_thin1_tool1 = extrude(extrude_thin1_sk1.sketch, amount=-EXTRUDE_THIN1_REACH, mode=Mode.PRIVATE) - part_1.part
    # Sketch12 → Extrude-Thin1 (add, up to next)
    with BuildSketch(Plane(origin=(0, 0, -19.939), x_dir=(-1, 0, 0), z_dir=(0, 0, -1)), mode=Mode.PRIVATE) as extrude_thin1_sk2:
        with Locations((-36.5125, 12.7)):
            Circle(SKETCH12_R)
        with Locations((-36.5125, 12.7)):
            Circle(SKETCH12_R_2, mode=Mode.SUBTRACT)
    extrude_thin1_tool2 = extrude(extrude_thin1_sk2.sketch, amount=-EXTRUDE_THIN1_REACH, mode=Mode.PRIVATE) - part_1.part
    # Sketch12 → Extrude-Thin1 (add, up to next)
    with BuildSketch(Plane(origin=(0, 0, -19.939), x_dir=(-1, 0, 0), z_dir=(0, 0, -1)), mode=Mode.PRIVATE) as extrude_thin1_sk3:
        with Locations((-60.325, 12.7)):
            Circle(SKETCH12_R)
        with Locations((-60.325, 12.7)):
            Circle(SKETCH12_R_2, mode=Mode.SUBTRACT)
    extrude_thin1_tool3 = extrude(extrude_thin1_sk3.sketch, amount=-EXTRUDE_THIN1_REACH, mode=Mode.PRIVATE) - part_1.part
    add(extrude_thin1_tool1.solids().sort_by_distance((17.556101, 12.7, -19.939))[0])
    add(extrude_thin1_tool2.solids().sort_by_distance((41.368601, 12.7, -19.939))[0])
    add(extrude_thin1_tool3.solids().sort_by_distance((65.181101, 12.7, -19.939))[0])

    # Fillet1
    fillet1_edges = [part_1.edges().sort_by_distance(p)[0] for p in [
        (48.41875, 12.7, -10.066651581),
        (24.60625, 12.7, -10.066651581),
        (24.60625, 12.7, 10.066651581),
        (48.41875, 12.7, 10.066651581),
        (17.69745, 12.7, 0),
        (41.50995, 12.7, 0),
        (31.51505, 12.7, 0),
        (55.32755, 12.7, 0),
    ]]
    fillet(fillet1_edges, radius=FILLET1_R)

    # Sketch13 → Cut-Revolve1 (revolve, cut)
    with BuildSketch(Plane.XY, mode=Mode.PRIVATE) as cut_revolve1_sk:
        with BuildLine():
            Line((0, 15.5829), (0, 9.652))
            ThreePointArc((0, 9.652), (1.228329609, 12.61745), (0, 15.5829))
        make_face()
    cut_revolve1 = revolve(cut_revolve1_sk.sketch.rotate(Axis((-80.9, 0, 0), (1, 0, 0)), 90), axis=Axis((-80.9, 0, 0), (1, 0, 0)), mode=Mode.SUBTRACT)

    # Mirror1: Cut-Revolve1 across plane
    add(cut_revolve1.mirror(Plane.ZY.offset(-36.5125)), mode=Mode.SUBTRACT)


solid = part_1.part
